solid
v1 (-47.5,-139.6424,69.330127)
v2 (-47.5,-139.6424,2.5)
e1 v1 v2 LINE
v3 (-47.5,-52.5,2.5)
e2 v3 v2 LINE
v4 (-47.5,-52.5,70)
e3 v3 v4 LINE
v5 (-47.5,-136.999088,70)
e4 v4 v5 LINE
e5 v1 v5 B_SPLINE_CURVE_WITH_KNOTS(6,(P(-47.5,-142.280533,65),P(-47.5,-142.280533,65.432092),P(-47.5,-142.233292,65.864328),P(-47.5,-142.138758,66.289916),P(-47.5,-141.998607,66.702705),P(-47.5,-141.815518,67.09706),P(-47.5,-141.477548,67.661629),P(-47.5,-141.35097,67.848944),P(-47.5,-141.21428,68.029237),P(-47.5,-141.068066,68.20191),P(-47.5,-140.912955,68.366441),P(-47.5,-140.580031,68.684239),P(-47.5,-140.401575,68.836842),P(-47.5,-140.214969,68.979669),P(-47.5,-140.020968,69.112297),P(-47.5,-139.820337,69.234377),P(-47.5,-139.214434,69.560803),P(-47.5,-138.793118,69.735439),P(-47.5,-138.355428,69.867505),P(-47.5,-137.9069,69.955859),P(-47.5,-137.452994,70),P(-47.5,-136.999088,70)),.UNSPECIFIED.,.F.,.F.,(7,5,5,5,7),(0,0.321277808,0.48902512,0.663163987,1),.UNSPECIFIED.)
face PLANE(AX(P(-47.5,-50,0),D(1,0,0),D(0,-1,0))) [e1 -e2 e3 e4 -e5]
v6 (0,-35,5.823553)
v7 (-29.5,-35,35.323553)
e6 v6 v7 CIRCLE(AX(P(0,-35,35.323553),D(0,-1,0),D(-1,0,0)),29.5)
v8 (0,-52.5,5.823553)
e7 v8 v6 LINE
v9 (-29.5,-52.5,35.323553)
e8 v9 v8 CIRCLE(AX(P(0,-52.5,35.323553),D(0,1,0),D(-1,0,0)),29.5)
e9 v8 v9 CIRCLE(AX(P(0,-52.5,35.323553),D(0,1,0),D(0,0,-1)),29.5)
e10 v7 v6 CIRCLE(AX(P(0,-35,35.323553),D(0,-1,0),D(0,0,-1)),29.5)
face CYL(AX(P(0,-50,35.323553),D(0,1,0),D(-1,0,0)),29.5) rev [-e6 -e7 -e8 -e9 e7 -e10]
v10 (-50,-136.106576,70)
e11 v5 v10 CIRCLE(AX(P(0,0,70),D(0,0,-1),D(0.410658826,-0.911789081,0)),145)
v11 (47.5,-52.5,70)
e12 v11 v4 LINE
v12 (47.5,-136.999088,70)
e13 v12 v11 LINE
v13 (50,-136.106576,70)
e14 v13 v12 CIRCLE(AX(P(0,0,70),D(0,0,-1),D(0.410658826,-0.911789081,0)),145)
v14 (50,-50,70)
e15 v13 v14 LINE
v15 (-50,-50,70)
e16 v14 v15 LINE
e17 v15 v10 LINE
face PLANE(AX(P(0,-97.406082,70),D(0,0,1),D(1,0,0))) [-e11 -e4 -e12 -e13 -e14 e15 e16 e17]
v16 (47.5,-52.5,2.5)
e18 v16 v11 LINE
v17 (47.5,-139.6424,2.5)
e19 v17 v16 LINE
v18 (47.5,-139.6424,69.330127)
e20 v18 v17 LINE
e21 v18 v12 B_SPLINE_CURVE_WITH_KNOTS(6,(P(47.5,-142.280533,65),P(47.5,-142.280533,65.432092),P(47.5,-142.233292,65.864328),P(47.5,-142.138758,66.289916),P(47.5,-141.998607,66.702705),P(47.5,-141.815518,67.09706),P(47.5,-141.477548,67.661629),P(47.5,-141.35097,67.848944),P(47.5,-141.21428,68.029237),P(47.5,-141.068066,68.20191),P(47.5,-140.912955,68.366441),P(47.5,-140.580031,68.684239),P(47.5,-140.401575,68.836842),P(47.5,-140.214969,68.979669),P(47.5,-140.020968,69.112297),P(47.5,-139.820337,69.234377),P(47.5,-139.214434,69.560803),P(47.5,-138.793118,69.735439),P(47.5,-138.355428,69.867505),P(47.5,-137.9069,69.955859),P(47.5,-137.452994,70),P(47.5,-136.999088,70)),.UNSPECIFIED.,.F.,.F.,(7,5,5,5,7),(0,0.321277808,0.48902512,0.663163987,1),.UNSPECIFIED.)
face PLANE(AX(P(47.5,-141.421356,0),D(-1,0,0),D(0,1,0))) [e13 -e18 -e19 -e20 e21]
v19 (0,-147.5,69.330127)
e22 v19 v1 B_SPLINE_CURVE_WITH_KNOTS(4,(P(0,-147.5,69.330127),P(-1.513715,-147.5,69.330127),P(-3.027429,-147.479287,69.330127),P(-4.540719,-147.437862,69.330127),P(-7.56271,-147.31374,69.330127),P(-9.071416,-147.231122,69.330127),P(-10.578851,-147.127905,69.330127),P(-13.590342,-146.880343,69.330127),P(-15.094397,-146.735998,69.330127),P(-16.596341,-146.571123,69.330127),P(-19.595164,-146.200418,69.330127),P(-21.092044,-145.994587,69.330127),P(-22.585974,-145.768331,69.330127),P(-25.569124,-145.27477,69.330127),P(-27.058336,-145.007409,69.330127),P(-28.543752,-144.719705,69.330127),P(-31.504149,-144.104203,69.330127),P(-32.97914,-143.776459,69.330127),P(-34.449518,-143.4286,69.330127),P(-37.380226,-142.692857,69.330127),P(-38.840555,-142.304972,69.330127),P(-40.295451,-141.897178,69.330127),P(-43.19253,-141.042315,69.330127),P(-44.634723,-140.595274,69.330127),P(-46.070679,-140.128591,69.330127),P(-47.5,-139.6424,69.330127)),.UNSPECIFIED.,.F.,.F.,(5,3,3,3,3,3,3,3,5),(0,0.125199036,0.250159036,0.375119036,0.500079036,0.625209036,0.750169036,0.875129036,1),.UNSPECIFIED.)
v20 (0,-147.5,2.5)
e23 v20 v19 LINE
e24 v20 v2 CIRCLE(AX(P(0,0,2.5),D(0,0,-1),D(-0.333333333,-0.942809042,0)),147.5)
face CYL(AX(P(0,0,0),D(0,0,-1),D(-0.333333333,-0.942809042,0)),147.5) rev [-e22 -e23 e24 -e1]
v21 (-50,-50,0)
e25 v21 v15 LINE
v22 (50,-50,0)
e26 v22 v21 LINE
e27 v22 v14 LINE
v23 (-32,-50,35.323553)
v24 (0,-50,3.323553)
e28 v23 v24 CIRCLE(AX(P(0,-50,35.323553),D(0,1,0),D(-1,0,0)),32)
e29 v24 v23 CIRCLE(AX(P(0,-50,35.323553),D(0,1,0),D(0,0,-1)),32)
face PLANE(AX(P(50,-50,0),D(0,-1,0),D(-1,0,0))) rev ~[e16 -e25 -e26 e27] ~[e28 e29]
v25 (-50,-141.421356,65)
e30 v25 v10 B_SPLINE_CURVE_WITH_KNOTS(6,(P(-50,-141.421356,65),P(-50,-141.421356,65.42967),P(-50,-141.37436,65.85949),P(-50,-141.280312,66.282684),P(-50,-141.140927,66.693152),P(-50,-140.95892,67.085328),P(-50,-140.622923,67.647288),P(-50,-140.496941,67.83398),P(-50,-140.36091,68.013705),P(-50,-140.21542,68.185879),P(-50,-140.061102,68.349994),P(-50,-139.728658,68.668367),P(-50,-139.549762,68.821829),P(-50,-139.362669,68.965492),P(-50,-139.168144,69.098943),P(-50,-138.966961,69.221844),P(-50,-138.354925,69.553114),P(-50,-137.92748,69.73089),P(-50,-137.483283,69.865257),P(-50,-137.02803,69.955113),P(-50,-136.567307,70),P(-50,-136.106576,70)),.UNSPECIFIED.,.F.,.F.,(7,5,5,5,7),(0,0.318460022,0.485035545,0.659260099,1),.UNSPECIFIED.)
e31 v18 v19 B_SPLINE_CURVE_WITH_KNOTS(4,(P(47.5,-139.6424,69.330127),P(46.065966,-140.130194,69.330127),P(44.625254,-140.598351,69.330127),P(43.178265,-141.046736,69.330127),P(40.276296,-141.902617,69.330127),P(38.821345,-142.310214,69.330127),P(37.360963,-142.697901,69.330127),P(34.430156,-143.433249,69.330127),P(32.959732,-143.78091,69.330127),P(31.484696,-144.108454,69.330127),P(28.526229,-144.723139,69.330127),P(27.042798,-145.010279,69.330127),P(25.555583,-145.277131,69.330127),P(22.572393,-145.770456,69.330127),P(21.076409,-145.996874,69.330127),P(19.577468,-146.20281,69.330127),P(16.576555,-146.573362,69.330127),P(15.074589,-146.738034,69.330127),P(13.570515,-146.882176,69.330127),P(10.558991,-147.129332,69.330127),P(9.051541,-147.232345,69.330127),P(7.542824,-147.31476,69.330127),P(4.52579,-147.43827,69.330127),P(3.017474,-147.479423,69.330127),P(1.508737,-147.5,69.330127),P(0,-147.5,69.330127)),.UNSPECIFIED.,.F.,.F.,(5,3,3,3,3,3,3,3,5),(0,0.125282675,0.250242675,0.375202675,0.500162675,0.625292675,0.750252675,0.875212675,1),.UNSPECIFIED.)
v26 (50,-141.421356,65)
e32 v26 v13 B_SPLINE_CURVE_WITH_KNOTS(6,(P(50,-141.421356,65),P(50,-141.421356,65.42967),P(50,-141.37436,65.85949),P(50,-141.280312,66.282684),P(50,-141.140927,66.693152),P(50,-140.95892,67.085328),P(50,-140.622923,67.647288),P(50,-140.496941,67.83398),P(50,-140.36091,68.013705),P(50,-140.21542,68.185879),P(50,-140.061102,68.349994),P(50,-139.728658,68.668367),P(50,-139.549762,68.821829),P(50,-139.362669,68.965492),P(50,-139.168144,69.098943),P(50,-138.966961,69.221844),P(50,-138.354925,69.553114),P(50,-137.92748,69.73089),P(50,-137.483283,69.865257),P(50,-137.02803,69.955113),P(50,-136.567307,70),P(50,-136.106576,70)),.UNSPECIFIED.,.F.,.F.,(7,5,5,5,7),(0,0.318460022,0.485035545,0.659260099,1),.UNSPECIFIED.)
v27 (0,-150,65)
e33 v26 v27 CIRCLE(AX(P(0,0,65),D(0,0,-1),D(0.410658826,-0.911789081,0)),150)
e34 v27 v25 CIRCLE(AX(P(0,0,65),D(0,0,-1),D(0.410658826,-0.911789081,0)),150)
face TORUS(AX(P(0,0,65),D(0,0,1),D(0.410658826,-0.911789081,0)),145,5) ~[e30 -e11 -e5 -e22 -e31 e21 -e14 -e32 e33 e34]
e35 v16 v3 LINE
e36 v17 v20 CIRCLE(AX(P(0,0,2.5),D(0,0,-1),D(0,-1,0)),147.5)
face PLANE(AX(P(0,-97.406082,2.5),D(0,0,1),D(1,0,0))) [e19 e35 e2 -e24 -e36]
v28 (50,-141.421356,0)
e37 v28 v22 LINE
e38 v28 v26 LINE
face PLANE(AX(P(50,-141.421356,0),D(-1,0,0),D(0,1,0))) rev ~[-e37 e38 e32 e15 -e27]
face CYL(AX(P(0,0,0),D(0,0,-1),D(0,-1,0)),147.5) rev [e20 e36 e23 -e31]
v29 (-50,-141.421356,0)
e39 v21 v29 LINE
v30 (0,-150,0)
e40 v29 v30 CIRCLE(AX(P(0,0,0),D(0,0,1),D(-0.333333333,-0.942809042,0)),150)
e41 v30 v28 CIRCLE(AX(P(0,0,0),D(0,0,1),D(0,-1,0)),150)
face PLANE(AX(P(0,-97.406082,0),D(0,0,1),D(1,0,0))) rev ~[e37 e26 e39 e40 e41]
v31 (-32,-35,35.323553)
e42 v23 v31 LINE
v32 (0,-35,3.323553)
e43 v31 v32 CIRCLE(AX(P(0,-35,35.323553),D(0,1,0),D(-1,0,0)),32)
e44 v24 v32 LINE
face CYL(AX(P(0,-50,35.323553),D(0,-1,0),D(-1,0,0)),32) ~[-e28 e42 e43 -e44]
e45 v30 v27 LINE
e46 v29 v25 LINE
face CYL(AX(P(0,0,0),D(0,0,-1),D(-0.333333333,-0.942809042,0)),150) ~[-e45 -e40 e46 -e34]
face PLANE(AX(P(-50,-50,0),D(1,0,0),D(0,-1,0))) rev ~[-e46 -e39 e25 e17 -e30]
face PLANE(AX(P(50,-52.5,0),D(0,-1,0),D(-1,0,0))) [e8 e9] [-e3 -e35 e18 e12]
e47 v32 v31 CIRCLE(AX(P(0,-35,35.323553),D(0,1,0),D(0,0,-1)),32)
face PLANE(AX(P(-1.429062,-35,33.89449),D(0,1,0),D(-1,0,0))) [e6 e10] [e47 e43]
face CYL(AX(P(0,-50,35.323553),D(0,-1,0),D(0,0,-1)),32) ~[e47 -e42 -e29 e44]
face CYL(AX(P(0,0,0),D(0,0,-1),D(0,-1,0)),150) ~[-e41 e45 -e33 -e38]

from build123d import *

# Parameters (mm, degrees)
F1_DEPTH    = 70
F2_T        = -2.5
F3_T2_ANGLE = 48.492455887
F5_DEPTH    = 15
F6_T        = -2.5
F7_DEPTH    = 25


# Not quite as in the source:
# - a fillet or chamfer that OpenCascade refuses, or shapes differently, is made with other operations: its cross-section is extruded or revolved along the edge and cut away or added


with BuildPart() as f1:
    # F0 (on Top) → F1 (new body)
    with BuildSketch(Plane.XY):
        with BuildLine():
            ThreePointArc((-50, -141.4213562373), (-25.3652968089, -147.839783948), (0, -150))
            ThreePointArc((0, -150), (25.3652968089, -147.839783948), (50, -141.4213562373))
            Line((50, -141.4213562373), (50, -50))
            Line((50, -50), (0, -50))
            Line((0, -50), (-50, -50))
            Line((-50, -50), (-50, -141.4213562373))
        make_face()
    extrude(amount=F1_DEPTH)

    # F2
    f2_openings = [f1.faces().sort_by_distance(p)[0] for p in [
        (0, -98.620362, 70),
    ]]
    offset(amount=F2_T, openings=f2_openings)

    # F3: fillet of radius 5 on 1 edges, made by hand

    # F3_s1 → F3_t2 (revolve, cut)
    with BuildSketch(Plane(origin=(0, 0, 0), x_dir=(0, 0, 1), z_dir=(0.9117890812, 0.410658826, 0))):
        with BuildLine():
            ThreePointArc((65, 150), (68.5355339059, 148.5355339059), (70, 145))
            Line((70, 145), (70, 150))
            Line((70, 150), (65, 150))
        make_face()
    revolve(axis=Axis((0, 0, 70), (0, 0, -1)), revolution_arc=F3_T2_ANGLE, mode=Mode.SUBTRACT)

    # F4 (on face) → F5 (join)
    with BuildSketch(Plane(origin=(0, -50, 0), x_dir=(-1, 0, 0), z_dir=(0, 1, 0))):
        with BuildLine():
            ThreePointArc((32, 35.3235527873), (-22.627416998, 57.9509697853), (0, 3.3235527873))
            ThreePointArc((0, 3.3235527873), (22.627416998, 12.6961357893), (32, 35.3235527873))
        make_face()
    extrude(amount=F5_DEPTH)

    # F6
    f6_openings = [f1.faces().sort_by_distance(p)[0] for p in [
        (0, -35, 35.323553),
    ]]
    offset(amount=F6_T, openings=f6_openings, kind=Kind.INTERSECTION)

    # F7 (cut): a face of the model
    f7_faces = [f1.faces().sort_by_distance(p)[0] for p in [
        (0, -50, 35.3235527873),
    ]]
    extrude(f7_faces, amount=-F7_DEPTH, mode=Mode.SUBTRACT)


solid = f1.part
